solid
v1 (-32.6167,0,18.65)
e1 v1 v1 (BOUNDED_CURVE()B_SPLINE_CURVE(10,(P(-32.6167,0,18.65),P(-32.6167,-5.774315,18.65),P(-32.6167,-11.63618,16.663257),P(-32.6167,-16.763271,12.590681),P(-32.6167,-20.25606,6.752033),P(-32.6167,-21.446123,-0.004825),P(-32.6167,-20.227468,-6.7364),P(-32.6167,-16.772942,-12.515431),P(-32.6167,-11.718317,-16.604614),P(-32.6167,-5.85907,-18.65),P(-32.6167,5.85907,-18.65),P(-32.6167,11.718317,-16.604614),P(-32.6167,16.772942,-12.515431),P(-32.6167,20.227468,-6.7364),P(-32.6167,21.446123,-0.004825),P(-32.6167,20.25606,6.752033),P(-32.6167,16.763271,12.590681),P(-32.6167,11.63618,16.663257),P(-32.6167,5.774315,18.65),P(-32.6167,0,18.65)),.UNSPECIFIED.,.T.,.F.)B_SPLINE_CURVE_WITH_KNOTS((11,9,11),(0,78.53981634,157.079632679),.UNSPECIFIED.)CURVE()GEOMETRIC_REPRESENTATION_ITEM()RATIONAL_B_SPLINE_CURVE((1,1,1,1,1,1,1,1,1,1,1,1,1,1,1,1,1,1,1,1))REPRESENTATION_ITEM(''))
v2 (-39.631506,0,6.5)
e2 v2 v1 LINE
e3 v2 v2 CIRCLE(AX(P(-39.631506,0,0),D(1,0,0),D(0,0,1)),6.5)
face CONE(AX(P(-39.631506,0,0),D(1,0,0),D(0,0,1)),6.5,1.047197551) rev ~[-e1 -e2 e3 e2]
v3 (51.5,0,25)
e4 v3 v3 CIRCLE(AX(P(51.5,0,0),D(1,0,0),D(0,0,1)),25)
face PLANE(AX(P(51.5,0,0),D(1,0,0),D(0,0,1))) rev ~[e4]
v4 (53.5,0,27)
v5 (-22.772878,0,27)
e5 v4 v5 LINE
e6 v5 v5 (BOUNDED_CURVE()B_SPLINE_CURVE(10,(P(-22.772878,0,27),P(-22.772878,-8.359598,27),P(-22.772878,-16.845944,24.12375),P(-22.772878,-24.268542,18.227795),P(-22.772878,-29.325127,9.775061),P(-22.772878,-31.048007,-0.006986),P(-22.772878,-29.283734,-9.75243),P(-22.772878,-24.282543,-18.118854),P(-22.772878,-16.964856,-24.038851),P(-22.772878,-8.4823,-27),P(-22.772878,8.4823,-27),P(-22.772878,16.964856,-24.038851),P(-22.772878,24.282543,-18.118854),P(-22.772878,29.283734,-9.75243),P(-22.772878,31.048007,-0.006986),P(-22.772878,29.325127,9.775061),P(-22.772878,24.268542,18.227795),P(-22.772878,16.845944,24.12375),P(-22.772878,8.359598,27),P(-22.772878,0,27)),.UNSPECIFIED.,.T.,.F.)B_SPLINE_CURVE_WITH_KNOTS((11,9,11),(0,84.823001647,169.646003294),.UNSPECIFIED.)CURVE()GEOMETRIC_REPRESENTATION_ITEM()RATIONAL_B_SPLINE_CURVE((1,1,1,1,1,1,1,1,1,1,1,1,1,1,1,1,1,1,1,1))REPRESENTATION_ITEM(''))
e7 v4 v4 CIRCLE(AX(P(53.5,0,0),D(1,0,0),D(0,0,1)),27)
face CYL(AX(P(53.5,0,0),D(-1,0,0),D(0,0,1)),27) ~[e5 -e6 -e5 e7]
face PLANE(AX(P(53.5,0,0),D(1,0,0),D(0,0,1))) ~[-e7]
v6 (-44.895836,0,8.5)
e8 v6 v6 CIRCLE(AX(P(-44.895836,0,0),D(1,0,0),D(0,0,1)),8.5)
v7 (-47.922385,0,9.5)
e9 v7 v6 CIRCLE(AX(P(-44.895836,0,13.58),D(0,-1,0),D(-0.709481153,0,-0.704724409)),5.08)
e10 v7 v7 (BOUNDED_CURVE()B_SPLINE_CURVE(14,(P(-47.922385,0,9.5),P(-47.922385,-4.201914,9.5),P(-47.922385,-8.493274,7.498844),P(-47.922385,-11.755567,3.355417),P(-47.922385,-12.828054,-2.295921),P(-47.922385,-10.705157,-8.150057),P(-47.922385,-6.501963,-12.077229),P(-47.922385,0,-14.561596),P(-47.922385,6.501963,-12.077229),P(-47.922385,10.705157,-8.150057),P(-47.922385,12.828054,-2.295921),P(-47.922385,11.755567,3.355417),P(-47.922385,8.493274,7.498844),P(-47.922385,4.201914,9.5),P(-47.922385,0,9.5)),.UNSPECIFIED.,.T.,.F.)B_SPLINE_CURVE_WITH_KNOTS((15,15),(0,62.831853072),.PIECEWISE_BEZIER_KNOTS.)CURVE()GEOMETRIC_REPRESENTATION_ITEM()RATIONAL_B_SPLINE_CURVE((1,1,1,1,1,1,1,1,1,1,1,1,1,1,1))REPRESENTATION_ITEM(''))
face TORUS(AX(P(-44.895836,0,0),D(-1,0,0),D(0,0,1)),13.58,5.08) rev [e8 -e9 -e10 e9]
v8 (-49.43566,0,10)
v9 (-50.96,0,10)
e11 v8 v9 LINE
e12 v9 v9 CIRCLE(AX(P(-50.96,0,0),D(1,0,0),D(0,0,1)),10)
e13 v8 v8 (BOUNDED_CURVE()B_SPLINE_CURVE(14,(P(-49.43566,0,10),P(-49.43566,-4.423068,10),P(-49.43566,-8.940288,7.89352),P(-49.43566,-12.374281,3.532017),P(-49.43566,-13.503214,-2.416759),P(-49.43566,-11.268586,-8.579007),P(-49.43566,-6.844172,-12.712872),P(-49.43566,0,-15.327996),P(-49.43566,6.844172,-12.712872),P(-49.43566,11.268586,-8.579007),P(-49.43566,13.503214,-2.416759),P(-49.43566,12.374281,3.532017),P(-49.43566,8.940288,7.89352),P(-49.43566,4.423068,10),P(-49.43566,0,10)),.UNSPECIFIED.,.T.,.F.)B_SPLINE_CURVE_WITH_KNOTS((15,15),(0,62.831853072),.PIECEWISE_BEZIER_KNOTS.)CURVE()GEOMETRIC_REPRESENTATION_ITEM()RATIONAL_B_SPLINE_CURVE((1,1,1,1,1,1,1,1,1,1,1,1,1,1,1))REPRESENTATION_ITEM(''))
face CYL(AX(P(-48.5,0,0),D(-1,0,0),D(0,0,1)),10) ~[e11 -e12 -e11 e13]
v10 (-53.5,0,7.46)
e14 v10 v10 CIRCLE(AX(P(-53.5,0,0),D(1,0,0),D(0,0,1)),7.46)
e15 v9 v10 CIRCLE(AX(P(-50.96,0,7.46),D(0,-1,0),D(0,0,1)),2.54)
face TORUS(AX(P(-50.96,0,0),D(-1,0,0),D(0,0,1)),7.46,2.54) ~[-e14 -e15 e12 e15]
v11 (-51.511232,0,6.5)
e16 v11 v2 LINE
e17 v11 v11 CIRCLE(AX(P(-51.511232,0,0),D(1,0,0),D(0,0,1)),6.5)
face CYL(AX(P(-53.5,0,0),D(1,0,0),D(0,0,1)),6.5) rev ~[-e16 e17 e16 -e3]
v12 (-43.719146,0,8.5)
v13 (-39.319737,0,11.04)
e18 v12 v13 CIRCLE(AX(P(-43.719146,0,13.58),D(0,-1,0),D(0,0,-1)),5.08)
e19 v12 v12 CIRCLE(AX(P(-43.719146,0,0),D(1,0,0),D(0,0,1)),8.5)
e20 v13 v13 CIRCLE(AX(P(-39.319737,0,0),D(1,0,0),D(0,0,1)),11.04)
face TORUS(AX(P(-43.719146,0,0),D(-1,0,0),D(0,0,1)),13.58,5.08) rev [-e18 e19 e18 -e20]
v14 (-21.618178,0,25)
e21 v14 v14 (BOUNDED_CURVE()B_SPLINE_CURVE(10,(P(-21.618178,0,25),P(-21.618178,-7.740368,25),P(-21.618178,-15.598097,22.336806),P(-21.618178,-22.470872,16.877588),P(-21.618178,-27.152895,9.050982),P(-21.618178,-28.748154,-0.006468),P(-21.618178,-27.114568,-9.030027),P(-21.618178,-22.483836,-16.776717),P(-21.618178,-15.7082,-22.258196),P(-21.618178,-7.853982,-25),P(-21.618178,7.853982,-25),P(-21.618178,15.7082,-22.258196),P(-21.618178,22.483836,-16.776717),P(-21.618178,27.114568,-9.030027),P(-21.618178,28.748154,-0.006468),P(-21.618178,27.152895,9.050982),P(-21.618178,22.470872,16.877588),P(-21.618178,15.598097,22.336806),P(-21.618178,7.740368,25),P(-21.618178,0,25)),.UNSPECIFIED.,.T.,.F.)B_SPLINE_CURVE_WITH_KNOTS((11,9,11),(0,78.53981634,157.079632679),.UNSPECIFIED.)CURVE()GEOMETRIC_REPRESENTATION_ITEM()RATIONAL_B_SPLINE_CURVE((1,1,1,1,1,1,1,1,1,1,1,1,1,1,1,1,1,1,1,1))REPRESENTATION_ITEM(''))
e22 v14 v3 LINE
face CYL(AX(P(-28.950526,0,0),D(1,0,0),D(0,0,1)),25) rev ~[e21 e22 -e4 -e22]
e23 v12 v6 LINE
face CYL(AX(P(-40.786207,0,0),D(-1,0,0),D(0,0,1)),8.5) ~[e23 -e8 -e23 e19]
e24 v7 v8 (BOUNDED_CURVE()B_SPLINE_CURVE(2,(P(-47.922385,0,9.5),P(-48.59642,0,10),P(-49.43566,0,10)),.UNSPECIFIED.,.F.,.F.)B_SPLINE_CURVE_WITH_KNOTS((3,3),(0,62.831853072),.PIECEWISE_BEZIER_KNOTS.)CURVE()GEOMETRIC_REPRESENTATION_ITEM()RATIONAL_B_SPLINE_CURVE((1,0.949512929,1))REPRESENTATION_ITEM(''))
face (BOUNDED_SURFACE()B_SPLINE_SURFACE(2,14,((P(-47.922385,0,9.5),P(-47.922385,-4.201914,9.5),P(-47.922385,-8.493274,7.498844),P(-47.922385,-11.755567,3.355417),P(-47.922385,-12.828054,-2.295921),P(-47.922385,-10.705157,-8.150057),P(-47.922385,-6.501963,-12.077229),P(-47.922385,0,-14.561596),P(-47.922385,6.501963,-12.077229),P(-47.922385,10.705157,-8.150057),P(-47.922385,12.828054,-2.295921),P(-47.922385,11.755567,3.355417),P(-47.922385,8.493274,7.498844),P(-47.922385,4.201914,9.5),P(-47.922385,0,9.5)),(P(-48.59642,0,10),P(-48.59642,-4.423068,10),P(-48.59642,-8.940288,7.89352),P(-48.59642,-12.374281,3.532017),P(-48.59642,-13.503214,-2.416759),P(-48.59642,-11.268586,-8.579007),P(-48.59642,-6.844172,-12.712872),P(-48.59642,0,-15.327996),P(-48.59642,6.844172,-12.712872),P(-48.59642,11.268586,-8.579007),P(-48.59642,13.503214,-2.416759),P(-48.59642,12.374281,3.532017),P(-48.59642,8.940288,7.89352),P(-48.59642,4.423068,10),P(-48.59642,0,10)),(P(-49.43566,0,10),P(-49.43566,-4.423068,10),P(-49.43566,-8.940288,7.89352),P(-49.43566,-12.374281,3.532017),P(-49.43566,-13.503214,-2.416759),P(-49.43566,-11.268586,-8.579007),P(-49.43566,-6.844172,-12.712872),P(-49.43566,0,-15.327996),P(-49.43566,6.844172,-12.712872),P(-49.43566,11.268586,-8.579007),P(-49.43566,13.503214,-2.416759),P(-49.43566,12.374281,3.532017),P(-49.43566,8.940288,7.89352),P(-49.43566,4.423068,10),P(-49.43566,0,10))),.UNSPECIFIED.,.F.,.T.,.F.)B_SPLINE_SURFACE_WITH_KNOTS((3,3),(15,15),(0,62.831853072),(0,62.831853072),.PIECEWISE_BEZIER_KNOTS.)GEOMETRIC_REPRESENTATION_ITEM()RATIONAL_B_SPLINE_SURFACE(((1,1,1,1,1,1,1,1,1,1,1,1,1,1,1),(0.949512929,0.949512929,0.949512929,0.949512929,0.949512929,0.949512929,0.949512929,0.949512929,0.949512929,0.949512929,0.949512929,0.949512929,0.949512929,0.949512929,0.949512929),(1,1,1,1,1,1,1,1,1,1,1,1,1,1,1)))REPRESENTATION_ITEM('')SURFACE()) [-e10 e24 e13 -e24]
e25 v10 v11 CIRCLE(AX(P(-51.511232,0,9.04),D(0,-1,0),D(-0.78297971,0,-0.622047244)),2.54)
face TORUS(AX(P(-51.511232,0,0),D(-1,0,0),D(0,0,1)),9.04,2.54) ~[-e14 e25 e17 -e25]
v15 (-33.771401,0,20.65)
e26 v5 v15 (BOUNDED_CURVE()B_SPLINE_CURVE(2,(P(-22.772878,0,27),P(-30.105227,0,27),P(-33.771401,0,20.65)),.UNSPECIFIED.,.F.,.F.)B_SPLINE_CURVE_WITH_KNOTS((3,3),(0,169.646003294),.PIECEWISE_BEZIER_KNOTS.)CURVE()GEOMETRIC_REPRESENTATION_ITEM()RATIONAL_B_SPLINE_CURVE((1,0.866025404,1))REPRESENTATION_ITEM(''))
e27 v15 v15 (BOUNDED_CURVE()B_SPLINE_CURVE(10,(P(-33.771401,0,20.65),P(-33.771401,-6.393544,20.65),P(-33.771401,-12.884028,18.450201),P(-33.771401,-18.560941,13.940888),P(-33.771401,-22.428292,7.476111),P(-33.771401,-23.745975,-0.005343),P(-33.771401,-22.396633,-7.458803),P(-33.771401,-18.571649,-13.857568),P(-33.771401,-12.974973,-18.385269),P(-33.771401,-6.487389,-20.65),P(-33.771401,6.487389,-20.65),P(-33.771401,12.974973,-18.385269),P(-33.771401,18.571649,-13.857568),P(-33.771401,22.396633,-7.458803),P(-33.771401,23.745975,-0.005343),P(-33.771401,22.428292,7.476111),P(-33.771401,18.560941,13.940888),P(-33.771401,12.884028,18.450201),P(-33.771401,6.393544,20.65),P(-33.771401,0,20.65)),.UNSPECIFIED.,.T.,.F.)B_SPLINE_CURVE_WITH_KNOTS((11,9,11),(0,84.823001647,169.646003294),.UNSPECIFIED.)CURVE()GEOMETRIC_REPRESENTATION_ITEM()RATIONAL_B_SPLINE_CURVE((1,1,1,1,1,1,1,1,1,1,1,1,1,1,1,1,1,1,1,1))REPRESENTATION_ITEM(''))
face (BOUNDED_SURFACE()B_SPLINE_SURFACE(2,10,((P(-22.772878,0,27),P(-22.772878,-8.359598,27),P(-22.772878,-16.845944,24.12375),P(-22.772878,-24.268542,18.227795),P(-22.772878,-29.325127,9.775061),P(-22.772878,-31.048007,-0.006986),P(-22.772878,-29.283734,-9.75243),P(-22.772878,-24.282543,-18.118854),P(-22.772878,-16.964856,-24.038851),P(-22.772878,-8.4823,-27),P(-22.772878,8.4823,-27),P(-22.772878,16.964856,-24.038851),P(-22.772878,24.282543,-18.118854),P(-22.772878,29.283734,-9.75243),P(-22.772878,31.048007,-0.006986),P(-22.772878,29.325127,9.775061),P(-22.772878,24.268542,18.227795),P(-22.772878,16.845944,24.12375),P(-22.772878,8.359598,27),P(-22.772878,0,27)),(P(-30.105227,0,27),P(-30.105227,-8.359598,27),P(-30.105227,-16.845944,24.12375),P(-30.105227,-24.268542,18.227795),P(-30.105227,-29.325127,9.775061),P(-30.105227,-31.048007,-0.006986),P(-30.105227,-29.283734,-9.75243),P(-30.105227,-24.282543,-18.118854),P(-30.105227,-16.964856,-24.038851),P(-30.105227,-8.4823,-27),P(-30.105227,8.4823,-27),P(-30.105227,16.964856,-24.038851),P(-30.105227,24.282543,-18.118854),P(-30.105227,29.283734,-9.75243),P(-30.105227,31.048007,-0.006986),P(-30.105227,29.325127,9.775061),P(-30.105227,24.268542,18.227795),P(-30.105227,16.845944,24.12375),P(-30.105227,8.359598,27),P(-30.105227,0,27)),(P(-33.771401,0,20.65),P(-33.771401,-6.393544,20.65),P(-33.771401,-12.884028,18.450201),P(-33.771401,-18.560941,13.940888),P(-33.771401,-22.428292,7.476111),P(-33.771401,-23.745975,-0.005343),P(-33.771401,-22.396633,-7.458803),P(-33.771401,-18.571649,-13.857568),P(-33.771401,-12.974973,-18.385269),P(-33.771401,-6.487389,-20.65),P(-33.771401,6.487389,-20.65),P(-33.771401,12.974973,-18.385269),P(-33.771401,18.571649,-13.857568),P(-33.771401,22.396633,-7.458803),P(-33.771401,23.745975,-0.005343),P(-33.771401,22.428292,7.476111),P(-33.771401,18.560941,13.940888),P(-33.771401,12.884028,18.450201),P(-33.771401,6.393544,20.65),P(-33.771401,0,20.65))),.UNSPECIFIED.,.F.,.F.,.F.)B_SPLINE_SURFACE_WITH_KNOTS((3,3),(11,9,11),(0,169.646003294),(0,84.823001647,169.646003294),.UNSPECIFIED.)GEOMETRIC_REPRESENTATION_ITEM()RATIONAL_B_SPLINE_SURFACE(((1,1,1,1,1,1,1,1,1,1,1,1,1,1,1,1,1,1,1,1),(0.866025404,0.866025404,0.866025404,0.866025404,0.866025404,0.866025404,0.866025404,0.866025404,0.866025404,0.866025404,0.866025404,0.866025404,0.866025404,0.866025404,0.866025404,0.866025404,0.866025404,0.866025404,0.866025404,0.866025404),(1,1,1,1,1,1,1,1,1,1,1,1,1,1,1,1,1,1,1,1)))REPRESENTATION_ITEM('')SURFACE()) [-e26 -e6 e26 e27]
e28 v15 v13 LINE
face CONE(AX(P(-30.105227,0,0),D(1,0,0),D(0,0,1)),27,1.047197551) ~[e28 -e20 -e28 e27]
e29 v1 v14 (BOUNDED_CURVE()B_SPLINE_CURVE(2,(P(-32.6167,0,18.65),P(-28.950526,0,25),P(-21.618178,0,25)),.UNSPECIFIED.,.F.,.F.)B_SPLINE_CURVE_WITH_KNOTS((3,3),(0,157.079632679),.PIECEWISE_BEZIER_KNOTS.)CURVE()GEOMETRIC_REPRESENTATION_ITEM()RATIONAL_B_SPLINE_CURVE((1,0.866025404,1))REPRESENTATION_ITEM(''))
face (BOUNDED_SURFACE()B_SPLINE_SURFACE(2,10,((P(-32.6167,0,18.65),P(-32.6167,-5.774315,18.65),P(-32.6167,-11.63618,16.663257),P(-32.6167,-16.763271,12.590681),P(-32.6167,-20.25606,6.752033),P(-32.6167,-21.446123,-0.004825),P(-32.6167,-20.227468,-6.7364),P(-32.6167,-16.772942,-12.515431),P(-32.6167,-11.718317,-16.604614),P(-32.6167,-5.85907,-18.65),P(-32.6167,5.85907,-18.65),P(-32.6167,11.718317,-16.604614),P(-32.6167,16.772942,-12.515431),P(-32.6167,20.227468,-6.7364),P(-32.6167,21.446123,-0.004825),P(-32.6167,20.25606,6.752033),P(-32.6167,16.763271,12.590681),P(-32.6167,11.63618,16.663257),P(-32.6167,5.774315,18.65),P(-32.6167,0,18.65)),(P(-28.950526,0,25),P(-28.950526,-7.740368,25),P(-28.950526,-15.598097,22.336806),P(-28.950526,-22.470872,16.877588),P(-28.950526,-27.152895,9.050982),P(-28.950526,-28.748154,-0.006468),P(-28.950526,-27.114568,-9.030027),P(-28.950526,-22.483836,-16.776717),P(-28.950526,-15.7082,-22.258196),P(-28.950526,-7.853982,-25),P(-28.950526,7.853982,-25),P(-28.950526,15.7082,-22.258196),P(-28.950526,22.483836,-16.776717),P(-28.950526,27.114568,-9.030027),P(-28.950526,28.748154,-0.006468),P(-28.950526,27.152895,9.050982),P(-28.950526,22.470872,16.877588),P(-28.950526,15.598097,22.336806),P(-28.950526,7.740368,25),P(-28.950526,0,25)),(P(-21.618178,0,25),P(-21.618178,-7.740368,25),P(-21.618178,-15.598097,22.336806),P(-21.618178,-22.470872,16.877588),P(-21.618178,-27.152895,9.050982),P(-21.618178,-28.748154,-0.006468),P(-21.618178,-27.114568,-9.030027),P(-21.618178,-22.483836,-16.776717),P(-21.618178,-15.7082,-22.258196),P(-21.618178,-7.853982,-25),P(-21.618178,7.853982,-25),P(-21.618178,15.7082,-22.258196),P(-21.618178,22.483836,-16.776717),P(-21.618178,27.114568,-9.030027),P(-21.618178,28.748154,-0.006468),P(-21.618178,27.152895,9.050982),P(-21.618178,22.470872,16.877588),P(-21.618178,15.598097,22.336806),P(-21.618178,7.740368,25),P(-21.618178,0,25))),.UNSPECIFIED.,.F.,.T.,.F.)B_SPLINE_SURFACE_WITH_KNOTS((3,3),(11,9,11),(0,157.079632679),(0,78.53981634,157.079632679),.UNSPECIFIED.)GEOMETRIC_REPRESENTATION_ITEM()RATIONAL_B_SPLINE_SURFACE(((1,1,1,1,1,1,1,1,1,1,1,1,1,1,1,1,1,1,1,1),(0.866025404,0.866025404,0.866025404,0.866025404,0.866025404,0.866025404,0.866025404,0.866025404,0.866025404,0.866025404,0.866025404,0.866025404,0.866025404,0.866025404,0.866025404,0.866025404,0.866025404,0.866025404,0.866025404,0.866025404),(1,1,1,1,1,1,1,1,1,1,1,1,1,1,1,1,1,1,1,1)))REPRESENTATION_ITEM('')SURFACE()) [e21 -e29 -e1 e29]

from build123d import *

# Parameters (mm, degrees)
F2_R = 12.7
F4_R = 2.54


# Not quite as in the source:
# - a fillet or chamfer that OpenCascade refuses, or shapes differently, is made with other operations: its cross-section is extruded or revolved along the edge and cut away or added


with BuildPart() as f1:
    # F0 (on Front) → F1 (revolve)
    with BuildSketch(Plane.XZ):
        Polygon((53.5, 27), (-30.1052267423, 27), (-40.7862067223, 8.5), (-48.5, 8.5), (-48.5, 10), (-53.5, 10), (-53.5, 6.5), (-39.6315061839, 6.5), (-28.9505262039, 25), (51.5, 25), (51.5, 0), (53.5, 0), align=None)
    revolve(axis=Axis((0, 0, 0), (1, 0, 0)))

    # F2
    f2_edges = [f1.edges().sort_by_distance(p)[0] for p in [
        (-30.105227, 0, -27),
        (-28.950526, 0, -25),
    ]]
    fillet(f2_edges, radius=F2_R)

    # F3: fillet of radius 5.08 on 2 edges, made by hand

    # F3_s1 → F3_t2 (revolve)
    with BuildSketch(Plane.XZ):
        with BuildLine():
            ThreePointArc((-43.7191460897, 8.5), (-41.1791460897, 9.1805909488), (-39.3197370385, 11.04))
            Line((-39.3197370385, 11.04), (-40.7862067223, 8.5))
            Line((-40.7862067223, 8.5), (-43.7191460897, 8.5))
        make_face()
    revolve(axis=Axis((-40.7862067223, 0, 0), (1, 0, 0)))

    # F3_s3 → F3_t4 (revolve)
    with BuildSketch(Plane.XZ):
        with BuildLine():
            ThreePointArc((-48.5, 10), (-46.8477578714, 8.8899680172), (-44.8958357418, 8.5))
            Line((-44.8958357418, 8.5), (-48.5, 8.5))
            Line((-48.5, 8.5), (-48.5, 10))
        make_face()
    revolve(axis=Axis((-48.5, 0, 0), (1, 0, 0)))

    # F4
    f4_edges = [f1.edges().sort_by_distance(p)[0] for p in [
        (-48.5, 0, -10),
        (-53.5, 0, -10),
    ]]
    fillet(f4_edges, radius=F4_R)

    # F5: fillet of radius 2.54 on 1 edges, made by hand

    # F5_s1 → F5_t2 (revolve, cut)
    with BuildSketch(Plane.XZ):
        with BuildLine():
            ThreePointArc((-53.5, 7.46), (-52.6154054362, 6.7525560116), (-51.5112315369, 6.5))
            Line((-51.5112315369, 6.5), (-53.5, 6.5))
            Line((-53.5, 6.5), (-53.5, 7.46))
        make_face()
    revolve(axis=Axis((-53.5, 0, 0), (1, 0, 0)), mode=Mode.SUBTRACT)


solid = f1.part
